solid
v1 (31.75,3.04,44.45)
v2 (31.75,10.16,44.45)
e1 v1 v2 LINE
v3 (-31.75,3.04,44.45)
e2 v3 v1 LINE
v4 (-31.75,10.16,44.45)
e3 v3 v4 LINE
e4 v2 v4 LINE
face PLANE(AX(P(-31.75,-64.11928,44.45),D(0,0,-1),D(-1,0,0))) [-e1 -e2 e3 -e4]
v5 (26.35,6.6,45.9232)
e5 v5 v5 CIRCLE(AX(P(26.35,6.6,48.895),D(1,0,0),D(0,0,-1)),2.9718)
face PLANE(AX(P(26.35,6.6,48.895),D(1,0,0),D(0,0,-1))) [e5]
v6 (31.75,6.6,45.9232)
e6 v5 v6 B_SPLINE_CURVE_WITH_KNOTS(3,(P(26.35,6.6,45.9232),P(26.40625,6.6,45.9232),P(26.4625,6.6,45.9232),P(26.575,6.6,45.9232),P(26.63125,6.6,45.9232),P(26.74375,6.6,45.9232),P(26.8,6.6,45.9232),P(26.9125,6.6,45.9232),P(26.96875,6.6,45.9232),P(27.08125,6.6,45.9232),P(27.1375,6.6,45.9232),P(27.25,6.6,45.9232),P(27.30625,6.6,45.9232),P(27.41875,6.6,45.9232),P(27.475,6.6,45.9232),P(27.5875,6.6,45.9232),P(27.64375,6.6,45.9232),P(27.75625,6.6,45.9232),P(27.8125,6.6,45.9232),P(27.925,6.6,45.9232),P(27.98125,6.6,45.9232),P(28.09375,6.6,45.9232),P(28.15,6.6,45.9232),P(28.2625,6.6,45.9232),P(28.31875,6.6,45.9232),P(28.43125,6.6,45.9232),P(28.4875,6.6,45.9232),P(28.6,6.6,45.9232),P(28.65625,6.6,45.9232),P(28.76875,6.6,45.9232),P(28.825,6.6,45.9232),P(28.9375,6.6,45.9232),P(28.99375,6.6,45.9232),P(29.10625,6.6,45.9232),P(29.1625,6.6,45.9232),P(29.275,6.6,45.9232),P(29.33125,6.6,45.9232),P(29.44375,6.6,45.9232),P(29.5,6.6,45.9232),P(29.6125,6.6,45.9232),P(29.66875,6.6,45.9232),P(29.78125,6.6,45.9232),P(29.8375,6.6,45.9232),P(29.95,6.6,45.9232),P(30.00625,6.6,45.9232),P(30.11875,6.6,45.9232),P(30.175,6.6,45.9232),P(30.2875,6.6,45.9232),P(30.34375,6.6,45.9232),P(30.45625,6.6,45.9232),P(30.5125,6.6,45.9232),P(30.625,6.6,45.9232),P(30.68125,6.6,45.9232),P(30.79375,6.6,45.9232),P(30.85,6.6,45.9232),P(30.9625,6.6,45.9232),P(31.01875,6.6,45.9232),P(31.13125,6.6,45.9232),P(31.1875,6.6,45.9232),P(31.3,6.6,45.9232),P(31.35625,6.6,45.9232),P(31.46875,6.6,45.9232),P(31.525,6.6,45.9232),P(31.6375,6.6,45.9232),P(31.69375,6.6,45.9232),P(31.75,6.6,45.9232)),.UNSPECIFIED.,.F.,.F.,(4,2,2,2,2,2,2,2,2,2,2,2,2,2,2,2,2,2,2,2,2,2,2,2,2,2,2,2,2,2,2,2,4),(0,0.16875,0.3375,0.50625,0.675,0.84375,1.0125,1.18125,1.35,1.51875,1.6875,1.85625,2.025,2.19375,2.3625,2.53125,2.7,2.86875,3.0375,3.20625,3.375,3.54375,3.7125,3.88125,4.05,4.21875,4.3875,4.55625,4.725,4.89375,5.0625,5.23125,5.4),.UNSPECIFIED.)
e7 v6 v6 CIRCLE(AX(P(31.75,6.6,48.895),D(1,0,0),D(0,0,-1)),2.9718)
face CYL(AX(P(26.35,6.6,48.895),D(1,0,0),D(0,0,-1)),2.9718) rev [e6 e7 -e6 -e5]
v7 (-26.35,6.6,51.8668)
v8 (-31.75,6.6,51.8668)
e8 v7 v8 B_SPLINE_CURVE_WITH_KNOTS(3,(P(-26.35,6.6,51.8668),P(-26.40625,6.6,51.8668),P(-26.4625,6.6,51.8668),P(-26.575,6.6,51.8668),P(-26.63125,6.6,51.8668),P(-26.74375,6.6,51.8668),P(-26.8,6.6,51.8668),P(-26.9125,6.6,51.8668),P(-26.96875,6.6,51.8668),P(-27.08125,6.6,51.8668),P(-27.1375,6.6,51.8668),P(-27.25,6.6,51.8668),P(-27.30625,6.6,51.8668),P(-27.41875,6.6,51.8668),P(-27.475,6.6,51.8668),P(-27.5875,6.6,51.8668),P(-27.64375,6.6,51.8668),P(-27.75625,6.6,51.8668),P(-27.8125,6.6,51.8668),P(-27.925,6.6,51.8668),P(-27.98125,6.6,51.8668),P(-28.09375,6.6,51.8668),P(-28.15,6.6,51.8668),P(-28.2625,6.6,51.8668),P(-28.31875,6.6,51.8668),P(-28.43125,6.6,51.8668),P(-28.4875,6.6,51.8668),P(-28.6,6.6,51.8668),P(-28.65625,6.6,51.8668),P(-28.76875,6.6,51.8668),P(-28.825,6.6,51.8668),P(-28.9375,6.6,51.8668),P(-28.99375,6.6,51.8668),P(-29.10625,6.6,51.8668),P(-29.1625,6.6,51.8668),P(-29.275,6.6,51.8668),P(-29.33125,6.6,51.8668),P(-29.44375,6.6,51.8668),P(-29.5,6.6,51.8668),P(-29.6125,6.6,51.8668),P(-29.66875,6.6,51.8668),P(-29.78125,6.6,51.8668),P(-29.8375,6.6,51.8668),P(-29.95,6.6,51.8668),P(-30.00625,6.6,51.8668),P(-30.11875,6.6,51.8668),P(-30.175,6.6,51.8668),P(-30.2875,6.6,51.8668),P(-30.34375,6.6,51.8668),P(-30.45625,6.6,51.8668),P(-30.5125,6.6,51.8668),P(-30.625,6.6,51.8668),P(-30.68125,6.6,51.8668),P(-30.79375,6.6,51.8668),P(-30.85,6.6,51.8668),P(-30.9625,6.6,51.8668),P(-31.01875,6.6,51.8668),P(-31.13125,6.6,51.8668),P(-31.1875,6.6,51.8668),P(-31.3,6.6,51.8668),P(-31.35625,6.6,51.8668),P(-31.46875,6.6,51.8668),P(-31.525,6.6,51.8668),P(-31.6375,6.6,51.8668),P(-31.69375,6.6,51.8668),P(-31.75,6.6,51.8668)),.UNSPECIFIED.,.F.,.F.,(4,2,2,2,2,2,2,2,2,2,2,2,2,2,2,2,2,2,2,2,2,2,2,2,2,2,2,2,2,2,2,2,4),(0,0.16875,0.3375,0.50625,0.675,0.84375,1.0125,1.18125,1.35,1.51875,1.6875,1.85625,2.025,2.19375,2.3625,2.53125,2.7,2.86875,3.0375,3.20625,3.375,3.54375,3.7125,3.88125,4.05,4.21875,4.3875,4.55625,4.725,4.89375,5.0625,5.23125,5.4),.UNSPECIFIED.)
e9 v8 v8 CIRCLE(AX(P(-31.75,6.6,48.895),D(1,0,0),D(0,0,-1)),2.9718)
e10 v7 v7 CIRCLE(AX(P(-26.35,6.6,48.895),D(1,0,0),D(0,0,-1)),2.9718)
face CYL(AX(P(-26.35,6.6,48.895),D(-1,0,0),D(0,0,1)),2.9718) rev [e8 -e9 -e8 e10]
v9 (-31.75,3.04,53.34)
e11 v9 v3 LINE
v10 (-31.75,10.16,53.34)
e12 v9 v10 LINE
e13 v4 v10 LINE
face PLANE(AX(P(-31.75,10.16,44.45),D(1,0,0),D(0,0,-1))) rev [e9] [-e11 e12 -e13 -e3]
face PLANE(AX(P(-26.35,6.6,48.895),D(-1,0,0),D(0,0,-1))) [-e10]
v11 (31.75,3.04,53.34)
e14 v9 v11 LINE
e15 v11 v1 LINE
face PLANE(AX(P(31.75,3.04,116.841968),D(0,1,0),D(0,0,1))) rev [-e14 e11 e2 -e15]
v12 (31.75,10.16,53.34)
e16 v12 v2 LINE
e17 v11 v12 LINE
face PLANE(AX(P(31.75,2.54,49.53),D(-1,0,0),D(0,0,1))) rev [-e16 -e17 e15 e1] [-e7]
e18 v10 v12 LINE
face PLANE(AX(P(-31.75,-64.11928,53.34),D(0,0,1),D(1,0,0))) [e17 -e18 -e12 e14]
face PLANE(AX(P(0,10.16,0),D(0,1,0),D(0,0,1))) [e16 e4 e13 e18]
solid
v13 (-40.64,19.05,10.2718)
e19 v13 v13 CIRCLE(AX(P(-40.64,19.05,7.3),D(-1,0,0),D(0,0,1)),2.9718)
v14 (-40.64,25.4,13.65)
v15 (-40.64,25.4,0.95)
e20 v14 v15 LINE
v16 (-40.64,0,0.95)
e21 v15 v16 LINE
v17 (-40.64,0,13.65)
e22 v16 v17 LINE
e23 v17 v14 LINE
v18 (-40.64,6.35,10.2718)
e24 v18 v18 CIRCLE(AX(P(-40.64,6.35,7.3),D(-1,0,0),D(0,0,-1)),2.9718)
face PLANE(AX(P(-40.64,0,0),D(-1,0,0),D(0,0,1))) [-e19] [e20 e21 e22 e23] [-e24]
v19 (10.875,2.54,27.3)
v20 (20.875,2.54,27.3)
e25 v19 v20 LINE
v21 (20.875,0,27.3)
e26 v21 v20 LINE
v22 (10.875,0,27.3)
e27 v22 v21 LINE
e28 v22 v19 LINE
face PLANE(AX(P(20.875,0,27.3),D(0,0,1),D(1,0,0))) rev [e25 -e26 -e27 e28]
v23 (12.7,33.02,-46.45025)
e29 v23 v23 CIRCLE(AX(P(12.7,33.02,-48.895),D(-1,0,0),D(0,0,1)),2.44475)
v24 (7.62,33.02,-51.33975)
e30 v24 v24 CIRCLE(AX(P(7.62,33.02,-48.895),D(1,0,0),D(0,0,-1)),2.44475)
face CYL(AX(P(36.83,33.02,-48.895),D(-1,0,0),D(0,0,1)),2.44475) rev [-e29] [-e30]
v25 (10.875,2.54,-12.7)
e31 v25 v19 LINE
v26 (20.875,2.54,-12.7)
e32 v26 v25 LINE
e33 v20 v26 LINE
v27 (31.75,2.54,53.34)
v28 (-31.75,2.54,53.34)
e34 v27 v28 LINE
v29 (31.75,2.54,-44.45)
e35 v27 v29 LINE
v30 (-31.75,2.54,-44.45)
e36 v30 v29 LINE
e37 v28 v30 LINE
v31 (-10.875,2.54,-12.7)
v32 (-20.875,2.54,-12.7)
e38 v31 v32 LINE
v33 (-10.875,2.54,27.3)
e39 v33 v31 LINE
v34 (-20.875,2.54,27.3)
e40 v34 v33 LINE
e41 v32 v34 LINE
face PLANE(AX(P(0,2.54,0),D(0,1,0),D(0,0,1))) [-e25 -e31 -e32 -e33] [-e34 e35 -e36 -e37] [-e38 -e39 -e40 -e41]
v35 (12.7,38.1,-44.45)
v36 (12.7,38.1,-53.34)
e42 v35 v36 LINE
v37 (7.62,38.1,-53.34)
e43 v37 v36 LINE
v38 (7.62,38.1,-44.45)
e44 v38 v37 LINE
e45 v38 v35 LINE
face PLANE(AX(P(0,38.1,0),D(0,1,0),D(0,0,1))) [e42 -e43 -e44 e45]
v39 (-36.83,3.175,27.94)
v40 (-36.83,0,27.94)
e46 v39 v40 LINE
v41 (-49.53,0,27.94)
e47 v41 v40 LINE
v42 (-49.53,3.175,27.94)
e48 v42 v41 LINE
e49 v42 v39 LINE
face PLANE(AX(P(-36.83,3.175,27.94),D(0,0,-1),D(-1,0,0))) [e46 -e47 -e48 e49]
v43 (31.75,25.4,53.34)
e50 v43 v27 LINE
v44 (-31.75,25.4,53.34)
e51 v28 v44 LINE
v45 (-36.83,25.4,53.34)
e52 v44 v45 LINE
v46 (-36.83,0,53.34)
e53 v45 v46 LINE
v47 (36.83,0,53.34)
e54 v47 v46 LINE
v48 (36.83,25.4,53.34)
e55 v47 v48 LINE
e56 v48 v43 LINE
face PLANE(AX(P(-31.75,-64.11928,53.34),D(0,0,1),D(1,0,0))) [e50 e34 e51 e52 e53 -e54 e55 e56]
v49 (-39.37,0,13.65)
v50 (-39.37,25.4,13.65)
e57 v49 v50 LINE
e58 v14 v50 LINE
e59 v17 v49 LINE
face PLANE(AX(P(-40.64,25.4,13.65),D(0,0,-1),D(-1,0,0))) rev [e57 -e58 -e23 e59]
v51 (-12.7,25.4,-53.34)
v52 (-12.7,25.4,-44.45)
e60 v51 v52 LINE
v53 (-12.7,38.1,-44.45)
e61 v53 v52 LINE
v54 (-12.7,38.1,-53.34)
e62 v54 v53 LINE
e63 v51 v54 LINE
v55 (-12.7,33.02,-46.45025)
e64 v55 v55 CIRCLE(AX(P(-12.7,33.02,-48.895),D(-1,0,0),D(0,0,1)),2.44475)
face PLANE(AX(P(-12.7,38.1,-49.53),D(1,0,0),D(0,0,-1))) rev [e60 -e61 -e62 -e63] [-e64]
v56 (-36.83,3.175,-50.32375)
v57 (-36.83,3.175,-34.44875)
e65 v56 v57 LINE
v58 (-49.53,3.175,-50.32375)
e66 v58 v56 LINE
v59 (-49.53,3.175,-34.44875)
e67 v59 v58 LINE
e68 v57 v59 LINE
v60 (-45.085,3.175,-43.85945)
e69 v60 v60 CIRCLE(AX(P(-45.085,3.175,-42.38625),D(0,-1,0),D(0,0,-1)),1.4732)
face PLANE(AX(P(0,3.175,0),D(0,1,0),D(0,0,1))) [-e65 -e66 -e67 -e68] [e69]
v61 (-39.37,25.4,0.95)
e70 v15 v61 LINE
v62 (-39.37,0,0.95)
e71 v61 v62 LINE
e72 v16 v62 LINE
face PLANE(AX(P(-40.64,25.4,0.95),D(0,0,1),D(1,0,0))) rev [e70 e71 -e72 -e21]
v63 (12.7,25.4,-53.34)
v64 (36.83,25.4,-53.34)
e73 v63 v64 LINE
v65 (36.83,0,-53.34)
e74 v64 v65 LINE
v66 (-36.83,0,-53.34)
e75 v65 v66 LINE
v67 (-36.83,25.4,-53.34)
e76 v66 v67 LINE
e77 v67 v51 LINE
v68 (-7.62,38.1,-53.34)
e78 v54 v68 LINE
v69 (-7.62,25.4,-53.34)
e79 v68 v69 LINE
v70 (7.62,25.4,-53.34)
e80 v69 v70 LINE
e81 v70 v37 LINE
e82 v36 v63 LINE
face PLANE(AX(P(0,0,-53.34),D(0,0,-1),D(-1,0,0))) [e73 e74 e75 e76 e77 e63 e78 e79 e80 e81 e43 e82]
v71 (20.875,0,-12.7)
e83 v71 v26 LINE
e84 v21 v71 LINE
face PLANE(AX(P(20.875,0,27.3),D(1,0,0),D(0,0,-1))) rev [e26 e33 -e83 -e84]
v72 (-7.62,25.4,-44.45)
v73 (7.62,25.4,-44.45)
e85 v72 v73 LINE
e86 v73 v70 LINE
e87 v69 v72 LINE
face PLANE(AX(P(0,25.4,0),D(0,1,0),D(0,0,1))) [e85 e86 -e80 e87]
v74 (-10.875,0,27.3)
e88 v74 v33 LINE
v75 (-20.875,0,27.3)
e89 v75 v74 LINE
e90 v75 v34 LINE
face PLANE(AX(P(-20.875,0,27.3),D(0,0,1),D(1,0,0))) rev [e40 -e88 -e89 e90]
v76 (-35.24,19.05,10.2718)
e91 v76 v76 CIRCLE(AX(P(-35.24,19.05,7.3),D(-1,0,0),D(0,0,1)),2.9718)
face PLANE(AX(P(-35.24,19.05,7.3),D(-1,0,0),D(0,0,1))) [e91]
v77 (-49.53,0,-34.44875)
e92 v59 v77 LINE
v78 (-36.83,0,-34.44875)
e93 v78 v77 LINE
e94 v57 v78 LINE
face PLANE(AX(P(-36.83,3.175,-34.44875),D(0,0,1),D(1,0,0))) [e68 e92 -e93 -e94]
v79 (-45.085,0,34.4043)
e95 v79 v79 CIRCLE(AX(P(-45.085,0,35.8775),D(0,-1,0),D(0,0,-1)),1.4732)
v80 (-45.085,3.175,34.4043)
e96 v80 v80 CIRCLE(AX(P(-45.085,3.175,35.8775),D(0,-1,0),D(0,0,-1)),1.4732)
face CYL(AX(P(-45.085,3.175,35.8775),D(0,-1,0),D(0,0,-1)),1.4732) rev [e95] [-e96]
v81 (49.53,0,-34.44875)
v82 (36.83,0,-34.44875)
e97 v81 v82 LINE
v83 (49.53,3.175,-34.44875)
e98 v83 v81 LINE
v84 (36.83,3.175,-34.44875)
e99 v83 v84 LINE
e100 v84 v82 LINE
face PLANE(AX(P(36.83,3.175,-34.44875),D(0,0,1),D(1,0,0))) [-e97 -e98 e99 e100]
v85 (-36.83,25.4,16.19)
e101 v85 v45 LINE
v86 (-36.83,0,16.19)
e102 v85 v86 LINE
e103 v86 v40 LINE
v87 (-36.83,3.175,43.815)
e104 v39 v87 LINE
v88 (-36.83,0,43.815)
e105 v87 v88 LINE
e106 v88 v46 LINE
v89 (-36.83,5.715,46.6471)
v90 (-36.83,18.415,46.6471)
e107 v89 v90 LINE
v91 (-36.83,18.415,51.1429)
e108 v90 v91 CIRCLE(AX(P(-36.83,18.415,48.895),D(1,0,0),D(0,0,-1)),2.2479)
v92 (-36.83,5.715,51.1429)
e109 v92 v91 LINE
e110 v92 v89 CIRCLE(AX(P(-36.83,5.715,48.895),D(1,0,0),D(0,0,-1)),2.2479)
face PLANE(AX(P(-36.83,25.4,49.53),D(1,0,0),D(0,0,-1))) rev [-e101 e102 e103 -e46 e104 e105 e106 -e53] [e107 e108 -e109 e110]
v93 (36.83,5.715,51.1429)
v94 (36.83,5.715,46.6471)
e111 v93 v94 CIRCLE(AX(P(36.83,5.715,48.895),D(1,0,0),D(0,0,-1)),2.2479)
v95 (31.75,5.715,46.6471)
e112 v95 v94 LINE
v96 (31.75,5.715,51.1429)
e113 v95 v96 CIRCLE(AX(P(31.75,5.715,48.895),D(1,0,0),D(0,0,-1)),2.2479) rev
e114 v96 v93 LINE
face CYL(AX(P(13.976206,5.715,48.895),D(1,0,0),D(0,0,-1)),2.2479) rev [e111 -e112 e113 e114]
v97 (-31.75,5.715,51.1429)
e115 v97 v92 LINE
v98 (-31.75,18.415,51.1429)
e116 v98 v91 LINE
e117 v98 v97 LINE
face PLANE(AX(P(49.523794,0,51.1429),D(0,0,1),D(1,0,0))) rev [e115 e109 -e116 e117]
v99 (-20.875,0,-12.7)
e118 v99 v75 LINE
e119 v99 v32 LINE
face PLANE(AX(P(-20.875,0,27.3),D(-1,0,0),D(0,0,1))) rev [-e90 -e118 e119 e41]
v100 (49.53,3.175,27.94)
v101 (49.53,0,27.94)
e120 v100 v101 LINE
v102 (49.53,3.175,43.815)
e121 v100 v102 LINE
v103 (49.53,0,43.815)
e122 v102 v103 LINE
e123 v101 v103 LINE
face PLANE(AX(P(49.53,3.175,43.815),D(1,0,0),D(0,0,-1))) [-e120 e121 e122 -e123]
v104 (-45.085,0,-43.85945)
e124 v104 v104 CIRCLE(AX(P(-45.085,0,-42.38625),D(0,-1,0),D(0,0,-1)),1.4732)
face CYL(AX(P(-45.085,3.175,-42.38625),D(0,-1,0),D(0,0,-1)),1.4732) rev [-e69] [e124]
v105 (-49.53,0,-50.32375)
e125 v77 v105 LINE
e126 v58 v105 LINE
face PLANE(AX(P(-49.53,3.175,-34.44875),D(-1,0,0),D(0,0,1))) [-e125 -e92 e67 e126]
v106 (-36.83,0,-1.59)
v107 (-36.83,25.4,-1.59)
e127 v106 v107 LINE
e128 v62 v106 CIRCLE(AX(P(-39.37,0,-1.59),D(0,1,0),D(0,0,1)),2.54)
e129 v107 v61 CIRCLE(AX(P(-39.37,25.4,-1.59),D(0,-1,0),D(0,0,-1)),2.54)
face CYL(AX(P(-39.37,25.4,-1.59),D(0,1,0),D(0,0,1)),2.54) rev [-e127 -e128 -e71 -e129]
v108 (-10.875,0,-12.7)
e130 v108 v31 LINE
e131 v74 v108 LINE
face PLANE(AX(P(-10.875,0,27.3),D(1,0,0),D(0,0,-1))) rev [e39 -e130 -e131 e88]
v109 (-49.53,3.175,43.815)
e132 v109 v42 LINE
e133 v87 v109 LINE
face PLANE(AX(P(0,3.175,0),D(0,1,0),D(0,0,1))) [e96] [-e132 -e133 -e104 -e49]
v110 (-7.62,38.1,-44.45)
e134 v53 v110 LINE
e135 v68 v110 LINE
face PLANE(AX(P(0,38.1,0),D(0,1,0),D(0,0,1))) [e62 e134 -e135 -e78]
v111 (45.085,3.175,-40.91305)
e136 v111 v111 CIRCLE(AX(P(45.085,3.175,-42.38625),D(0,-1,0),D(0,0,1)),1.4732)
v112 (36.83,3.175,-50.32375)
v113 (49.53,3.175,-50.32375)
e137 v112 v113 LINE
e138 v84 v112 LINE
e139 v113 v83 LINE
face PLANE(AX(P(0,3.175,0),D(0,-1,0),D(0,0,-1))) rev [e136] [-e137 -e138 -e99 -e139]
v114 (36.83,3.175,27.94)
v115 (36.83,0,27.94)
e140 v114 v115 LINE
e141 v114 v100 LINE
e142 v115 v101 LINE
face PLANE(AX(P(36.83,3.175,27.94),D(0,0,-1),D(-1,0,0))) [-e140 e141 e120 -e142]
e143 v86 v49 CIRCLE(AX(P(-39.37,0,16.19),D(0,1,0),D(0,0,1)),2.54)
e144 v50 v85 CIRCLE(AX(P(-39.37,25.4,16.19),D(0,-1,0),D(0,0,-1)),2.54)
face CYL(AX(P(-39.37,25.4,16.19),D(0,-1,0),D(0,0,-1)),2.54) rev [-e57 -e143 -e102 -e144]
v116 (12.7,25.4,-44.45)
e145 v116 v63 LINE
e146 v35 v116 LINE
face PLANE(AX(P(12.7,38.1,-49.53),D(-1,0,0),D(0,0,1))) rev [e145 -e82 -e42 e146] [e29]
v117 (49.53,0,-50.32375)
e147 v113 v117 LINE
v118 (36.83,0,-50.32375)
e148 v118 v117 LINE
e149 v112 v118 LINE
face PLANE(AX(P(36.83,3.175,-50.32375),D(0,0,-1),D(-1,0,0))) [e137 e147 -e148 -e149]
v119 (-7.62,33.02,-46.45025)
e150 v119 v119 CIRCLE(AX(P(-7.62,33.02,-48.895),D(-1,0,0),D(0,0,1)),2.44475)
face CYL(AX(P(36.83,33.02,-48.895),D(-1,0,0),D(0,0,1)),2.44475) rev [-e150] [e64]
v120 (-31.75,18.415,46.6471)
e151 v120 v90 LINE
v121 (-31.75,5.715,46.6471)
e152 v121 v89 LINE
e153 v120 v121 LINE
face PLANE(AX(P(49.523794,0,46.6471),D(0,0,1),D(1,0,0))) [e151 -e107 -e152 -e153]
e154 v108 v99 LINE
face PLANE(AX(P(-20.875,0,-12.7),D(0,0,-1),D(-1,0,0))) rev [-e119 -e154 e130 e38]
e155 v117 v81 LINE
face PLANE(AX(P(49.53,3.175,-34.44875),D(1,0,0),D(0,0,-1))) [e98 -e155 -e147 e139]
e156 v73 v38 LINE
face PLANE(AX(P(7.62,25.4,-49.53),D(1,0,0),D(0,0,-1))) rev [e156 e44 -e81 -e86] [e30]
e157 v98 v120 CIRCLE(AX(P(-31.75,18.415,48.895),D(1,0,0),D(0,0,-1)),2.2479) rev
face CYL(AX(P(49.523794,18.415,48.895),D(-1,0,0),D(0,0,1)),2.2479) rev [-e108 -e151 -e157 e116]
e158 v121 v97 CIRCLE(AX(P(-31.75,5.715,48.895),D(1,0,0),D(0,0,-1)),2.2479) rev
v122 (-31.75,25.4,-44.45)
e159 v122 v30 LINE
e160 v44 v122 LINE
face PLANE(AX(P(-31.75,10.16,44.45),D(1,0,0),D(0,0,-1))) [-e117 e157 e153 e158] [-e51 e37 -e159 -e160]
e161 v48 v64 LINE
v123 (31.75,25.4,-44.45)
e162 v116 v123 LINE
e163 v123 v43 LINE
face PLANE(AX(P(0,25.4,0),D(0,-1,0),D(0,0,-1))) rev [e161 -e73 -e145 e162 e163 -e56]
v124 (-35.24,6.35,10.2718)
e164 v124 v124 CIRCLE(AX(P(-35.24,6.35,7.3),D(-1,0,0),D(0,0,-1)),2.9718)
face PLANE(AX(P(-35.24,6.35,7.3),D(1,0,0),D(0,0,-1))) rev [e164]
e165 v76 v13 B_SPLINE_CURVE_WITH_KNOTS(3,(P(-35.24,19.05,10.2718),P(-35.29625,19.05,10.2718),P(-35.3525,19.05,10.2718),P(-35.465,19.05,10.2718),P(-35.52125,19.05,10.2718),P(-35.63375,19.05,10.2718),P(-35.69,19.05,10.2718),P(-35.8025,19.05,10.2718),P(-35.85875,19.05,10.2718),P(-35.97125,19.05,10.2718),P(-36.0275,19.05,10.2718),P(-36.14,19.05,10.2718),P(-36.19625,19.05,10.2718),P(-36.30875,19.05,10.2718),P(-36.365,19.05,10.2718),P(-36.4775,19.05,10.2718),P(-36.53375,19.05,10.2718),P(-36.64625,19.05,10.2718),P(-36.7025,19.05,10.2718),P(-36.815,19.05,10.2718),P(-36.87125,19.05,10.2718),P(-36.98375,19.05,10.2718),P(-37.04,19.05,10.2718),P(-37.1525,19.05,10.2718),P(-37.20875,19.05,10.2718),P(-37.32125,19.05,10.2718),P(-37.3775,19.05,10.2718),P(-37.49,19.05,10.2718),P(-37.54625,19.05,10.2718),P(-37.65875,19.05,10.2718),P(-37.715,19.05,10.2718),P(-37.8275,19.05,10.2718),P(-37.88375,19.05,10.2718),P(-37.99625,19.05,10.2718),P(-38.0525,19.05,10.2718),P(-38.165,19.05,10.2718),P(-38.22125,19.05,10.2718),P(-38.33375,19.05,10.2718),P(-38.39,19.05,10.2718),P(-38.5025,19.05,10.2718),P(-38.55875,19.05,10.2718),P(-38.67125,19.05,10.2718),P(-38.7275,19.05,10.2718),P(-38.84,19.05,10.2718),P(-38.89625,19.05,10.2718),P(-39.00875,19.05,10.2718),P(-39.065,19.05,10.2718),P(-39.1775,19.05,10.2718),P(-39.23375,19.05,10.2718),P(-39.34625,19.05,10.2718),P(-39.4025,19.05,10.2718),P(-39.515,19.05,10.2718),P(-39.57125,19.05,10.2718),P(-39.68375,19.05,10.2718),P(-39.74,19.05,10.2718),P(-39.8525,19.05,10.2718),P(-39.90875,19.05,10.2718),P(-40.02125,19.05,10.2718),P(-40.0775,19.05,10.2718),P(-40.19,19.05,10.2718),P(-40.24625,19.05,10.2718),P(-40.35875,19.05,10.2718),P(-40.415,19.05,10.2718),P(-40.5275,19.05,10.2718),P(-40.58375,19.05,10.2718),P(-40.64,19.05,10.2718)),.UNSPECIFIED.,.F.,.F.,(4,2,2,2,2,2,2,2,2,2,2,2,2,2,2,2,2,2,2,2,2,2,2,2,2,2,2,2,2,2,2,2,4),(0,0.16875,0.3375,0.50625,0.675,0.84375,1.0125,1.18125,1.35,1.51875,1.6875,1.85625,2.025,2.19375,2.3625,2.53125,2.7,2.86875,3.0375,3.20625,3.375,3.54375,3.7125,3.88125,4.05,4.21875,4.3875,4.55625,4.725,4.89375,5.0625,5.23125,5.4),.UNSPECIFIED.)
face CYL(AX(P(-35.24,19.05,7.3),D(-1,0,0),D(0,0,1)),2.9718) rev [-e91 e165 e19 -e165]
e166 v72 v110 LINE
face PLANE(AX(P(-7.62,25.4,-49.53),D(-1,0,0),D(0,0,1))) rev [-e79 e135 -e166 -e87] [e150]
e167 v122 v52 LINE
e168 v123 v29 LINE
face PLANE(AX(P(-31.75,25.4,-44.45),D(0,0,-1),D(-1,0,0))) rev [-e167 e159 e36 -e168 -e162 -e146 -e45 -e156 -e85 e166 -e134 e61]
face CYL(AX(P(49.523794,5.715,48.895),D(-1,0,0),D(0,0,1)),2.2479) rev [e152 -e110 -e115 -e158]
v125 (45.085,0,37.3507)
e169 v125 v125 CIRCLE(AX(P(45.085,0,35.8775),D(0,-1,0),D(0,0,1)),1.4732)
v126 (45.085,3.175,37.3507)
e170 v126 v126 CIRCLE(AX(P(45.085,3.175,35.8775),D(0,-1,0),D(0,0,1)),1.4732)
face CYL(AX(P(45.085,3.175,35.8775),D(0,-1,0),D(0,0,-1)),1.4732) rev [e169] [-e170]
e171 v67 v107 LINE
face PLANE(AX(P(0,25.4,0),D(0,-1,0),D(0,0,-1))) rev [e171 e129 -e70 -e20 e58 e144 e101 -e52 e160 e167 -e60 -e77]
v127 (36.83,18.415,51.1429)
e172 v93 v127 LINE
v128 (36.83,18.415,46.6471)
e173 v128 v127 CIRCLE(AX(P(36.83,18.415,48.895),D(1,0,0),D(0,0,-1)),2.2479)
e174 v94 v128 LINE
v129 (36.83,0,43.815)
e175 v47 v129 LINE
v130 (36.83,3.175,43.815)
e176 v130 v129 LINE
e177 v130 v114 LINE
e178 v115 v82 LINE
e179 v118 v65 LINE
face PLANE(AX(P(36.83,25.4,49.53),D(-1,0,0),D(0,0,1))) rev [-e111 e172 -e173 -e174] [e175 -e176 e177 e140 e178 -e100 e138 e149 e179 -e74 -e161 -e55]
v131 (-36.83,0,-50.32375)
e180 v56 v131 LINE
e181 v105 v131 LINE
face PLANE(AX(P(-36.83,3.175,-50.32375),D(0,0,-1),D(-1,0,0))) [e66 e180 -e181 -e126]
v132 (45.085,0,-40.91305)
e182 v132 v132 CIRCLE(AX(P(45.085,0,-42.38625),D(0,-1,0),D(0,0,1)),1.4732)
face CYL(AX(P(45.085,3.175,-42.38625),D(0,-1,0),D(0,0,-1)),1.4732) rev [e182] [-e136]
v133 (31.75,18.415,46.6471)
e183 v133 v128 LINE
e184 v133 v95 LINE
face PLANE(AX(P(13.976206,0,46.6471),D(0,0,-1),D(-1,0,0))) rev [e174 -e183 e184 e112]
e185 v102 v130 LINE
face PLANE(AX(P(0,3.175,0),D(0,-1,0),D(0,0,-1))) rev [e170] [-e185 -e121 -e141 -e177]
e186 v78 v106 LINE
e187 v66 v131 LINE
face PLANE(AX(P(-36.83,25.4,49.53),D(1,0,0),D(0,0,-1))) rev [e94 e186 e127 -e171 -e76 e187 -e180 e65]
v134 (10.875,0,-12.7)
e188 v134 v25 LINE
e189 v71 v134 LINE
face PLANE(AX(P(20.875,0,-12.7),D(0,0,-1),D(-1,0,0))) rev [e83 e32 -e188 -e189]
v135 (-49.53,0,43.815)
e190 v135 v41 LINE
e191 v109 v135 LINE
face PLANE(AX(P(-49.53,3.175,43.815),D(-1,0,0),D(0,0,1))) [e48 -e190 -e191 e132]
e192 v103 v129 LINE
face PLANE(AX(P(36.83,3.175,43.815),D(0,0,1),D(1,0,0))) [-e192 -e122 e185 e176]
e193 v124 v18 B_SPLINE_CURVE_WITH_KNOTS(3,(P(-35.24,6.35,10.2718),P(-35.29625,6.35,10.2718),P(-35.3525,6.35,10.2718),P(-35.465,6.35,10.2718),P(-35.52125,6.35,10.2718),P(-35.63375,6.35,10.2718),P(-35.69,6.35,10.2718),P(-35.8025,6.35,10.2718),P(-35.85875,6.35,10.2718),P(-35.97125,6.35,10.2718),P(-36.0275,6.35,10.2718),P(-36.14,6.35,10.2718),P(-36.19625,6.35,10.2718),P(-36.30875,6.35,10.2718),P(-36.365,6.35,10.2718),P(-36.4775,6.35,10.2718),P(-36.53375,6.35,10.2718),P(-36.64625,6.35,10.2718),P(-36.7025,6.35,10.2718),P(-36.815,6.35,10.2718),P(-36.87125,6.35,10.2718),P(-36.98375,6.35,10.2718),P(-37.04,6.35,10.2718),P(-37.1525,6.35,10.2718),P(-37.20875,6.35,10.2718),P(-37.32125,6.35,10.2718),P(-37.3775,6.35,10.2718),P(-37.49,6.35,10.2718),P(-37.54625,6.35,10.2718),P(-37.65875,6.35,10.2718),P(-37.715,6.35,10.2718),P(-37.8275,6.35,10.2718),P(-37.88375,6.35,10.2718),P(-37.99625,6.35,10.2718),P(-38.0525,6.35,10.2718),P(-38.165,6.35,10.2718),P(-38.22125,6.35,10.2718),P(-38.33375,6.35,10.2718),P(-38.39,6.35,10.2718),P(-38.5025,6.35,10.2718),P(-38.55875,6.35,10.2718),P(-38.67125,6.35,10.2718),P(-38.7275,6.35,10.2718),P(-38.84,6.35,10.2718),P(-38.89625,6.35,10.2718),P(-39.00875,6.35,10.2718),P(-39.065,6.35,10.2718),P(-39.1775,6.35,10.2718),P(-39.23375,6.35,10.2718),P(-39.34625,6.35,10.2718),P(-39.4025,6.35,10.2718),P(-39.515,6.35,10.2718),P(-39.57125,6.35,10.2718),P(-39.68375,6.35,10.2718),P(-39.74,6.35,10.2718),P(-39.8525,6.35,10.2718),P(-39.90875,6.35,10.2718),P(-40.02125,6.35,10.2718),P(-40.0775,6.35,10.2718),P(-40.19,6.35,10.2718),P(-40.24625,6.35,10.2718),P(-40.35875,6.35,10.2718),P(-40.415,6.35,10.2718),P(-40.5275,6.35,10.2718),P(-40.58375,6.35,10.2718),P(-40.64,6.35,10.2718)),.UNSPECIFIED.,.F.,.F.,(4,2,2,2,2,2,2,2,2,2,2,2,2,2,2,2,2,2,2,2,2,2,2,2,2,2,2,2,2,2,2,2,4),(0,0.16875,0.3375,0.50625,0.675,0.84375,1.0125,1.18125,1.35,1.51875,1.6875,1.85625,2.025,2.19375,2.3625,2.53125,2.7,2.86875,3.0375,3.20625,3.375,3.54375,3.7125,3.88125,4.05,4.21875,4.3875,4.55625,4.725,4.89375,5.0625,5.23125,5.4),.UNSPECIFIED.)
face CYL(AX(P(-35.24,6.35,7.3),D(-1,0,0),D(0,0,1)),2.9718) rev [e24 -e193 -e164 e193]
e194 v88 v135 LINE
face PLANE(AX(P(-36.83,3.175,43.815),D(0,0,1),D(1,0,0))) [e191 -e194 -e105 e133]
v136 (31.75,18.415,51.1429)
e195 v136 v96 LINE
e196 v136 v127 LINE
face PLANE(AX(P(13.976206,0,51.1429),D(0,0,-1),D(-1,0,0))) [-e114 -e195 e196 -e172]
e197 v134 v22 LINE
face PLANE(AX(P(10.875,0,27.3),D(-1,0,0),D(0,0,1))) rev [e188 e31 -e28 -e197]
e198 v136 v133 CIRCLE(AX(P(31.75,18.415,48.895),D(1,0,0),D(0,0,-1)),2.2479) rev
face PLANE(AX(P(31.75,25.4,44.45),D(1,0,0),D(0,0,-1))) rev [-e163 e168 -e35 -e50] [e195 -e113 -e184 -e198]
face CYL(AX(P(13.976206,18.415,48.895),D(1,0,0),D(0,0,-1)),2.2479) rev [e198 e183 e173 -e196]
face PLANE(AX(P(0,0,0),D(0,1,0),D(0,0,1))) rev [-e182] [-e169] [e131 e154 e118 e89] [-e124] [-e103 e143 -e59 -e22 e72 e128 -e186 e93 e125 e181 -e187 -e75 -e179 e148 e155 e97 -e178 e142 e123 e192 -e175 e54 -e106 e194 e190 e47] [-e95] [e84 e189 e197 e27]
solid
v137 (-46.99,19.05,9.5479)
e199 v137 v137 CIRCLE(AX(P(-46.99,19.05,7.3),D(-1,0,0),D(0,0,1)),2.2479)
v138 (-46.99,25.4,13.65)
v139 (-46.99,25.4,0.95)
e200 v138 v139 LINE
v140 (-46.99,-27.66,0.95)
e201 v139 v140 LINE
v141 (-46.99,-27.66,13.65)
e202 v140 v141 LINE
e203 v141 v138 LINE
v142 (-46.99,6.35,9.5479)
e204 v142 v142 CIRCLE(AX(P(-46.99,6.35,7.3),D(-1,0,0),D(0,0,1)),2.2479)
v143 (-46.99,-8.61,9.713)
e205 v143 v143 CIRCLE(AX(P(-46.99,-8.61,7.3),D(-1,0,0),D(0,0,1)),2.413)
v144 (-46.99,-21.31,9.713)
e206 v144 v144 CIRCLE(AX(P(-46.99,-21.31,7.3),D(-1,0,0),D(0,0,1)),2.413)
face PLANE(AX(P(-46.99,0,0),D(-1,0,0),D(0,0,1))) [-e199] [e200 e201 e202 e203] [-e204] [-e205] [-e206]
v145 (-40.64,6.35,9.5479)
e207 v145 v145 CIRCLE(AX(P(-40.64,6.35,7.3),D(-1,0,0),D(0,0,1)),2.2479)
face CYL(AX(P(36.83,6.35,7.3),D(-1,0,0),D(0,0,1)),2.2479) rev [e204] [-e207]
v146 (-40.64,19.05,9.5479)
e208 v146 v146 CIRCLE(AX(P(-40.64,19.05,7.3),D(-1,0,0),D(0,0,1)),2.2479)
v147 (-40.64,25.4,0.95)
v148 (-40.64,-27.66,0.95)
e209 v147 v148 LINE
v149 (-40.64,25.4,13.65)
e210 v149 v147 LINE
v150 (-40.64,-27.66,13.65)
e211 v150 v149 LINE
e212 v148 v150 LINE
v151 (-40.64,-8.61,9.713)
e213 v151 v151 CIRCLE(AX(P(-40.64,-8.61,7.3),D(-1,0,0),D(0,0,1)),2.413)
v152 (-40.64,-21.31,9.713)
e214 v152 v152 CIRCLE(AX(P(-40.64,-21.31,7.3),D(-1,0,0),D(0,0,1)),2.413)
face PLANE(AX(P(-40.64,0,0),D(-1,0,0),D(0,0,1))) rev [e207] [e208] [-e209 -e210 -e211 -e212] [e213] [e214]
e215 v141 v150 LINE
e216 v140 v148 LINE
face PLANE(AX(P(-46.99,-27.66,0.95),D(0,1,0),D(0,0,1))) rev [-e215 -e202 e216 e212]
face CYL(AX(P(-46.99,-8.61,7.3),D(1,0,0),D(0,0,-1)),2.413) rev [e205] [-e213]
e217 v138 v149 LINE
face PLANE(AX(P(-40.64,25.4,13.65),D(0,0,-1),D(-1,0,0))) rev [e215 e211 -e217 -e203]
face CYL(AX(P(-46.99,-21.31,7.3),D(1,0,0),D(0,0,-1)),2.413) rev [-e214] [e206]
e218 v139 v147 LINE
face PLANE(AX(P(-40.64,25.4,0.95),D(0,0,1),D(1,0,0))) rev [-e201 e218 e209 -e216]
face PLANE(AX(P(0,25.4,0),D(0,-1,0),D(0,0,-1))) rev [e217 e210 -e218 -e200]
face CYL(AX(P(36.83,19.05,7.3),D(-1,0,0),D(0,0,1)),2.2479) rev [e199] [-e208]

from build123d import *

# Parameters (mm, degrees)
SKETCH3_W                  = 63.5
SKETCH3_H                  = 88.9
BOSS_EXTRUDE1_DEPTH        = 2.54
BOSS_EXTRUDE2_DEPTH        = 25.4
SKETCH11_W                 = 25.4
SKETCH11_H                 = 5.08
BOSS_EXTRUDE10_DEPTH       = 12.7
SKETCH12_W                 = 15.24
SKETCH12_H                 = 5.08
CUT_EXTRUDE3_DEPTH         = 12.7
BOSS_EXTRUDE11_DEPTH       = 3.81
SKETCH13_R                 = 2.44475
CUT_EXTRUDE4_DEPTH         = 83.158301467
SKETCH5_W                  = 10
SKETCH5_H                  = 40
WHEEL_CUTOUTS_DEPTH        = 74.933200255
SKETCH7_W                  = 12.7
SKETCH7_H                  = 25.4
BOSS_EXTRUDE4_DEPTH        = 3.81
SKETCH8_W                  = 12.7
SKETCH8_H                  = 53.06
SKETCH8_R                  = 2.413
BOSS_EXTRUDE5_DEPTH        = 6.35
FILLET1_R                  = 2.54
BOSS_EXTRUDE9_START        = -2.54
SKETCH9_W                  = 63.5
SKETCH9_H                  = 8.89
BOSS_EXTRUDE9_DEPTH        = 10.16
CUT_EXTRUDE2_REACH         = 116.989
SKETCH10_W                 = 63.5
SKETCH10_H                 = 0.5
SPLIT2_START               = -31.75
SPLIT2_OUTLINE_W           = 7.12
SPLIT2_OUTLINE_H           = 8.89
SPLIT2_DEPTH               = 63.5
SPLIT2_2_OUTLINE_W         = 7.12
SPLIT2_2_OUTLINE_H         = 8.89
SPLIT2_2_DEPTH             = 63.5
SKETCH15_R                 = 2.9718
HEATSERT_HOLES_DEPTH       = 5.4
EXTRA_LENGTH_DEPTH         = 3.81
SLOT_DEPTH                 = 68.58
SKETCH18_R                 = 2.9718
MOTOR_HEATSERT_HOLES_DEPTH = 5.4
SKETCH19_R                 = 2.2479
CUT_EXTRUDE6_DEPTH         = 107.407509134
SKETCH20_W                 = 12.7
SKETCH20_H                 = 15.875
SKETCH20_R                 = 1.4732
FEET_DEPTH                 = 3.175


# Read off the part's stored shape, not the designer's step: Split2, Split3
with BuildPart() as part:
    # Sketch3 → Boss-Extrude1 (new body)
    with BuildSketch(Plane(origin=(0, 0, 0), x_dir=(1, 0, 0), z_dir=(0, 1, 0))):
        Rectangle(SKETCH3_W, SKETCH3_H)
    extrude(amount=BOSS_EXTRUDE1_DEPTH)

    # Sketch4 → Boss-Extrude2 (add)
    with BuildSketch(Plane(origin=(0, 0, 0), x_dir=(1, 0, 0), z_dir=(0, 1, 0))):
        Polygon((-31.75, -44.45), (-31.75, 44.45), (31.75, 44.45), (31.75, -44.45), (31.75, -49.53), (36.83, -49.53), (36.83, 49.53), (-36.83, 49.53), (-36.83, -49.53), (-31.75, -49.53), align=None)
    extrude(amount=BOSS_EXTRUDE2_DEPTH)

    # Sketch11 → Boss-Extrude10 (add)
    with BuildSketch(Plane(origin=(0, 25.4, 0), x_dir=(1, 0, 0), z_dir=(0, 1, 0))):
        with Locations((0, 46.99)):
            Rectangle(SKETCH11_W, SKETCH11_H)
    extrude(amount=BOSS_EXTRUDE10_DEPTH)

    # Sketch12 → Cut-Extrude3 (cut)
    with BuildSketch(Plane(origin=(0, 38.1, 0), x_dir=(1, 0, 0), z_dir=(0, 1, 0))):
        with Locations((0, 46.99)):
            Rectangle(SKETCH12_W, SKETCH12_H)
    extrude(amount=-CUT_EXTRUDE3_DEPTH, mode=Mode.SUBTRACT)

    # Sketch14 → Boss-Extrude11 (add)
    with BuildSketch(Plane(origin=(0, 0, -49.53), x_dir=(-1, 0, 0), z_dir=(0, 0, -1))):
        Polygon((12.7, 38.1), (7.62, 38.1), (7.62, 25.4), (-7.62, 25.4), (-7.62, 38.1), (-12.7, 38.1), (-12.7, 25.4), (-36.83, 25.4), (-36.83, 0), (36.83, 0), (36.83, 25.4), (12.7, 25.4), align=None)
    extrude(amount=BOSS_EXTRUDE11_DEPTH)

    # Sketch13 → Cut-Extrude4 (cut, through all)
    with BuildSketch(Plane.ZY.offset(12.7)):
        with Locations((-48.895, 33.02)):
            Circle(SKETCH13_R)
    extrude(amount=-CUT_EXTRUDE4_DEPTH, mode=Mode.SUBTRACT)

    # Sketch5 → Wheel Cutouts (cut, through all)
    with BuildSketch(Plane(origin=(0, 2.54, 0), x_dir=(1, 0, 0), z_dir=(0, 1, 0))):
        with Locations((15.875, -7.3)):
            Rectangle(SKETCH5_W, SKETCH5_H)
        with Locations((-15.875, -7.3)):
            Rectangle(SKETCH5_W, SKETCH5_H)
    extrude(amount=-WHEEL_CUTOUTS_DEPTH, mode=Mode.SUBTRACT)

    # Sketch7 → Boss-Extrude4 (add)
    with BuildSketch(Plane.ZY.offset(36.83)):
        with Locations((7.3, 12.7)):
            Rectangle(SKETCH7_W, SKETCH7_H)
    extrude(amount=BOSS_EXTRUDE4_DEPTH)

    # Sketch8 → Boss-Extrude5 (add)
    with BuildSketch(Plane.ZY.offset(40.64)):
        with Locations((7.3, -1.13)):
            Rectangle(SKETCH8_W, SKETCH8_H)
        with Locations((7.3, -21.31)):
            Circle(SKETCH8_R, mode=Mode.SUBTRACT)
        with Locations((7.3, -8.61)):
            Circle(SKETCH8_R, mode=Mode.SUBTRACT)
    extrude(amount=BOSS_EXTRUDE5_DEPTH)

    # Fillet1
    fillet1_edges = [part.edges().sort_by_distance(p)[0] for p in [
        (-36.83, 12.7, 0.95),
        (-36.83, 12.7, 13.65),
    ]]
    fillet(fillet1_edges, radius=FILLET1_R)

    # Sketch9 → Boss-Extrude9 (add)
    with BuildSketch(Plane(origin=(0, 2.54, 0), x_dir=(1, 0, 0), z_dir=(0, 1, 0)).offset(BOSS_EXTRUDE9_START)):
        with Locations((0, -48.895)):
            Rectangle(SKETCH9_W, SKETCH9_H)
    extrude(amount=BOSS_EXTRUDE9_DEPTH)

    # Cut-Extrude2: up to this face of the body (flat: up to its plane)
    cut_extrude2_end = Plane(part.part.faces().sort_by_distance((0, 5.08, 53.34))[0])
    # Sketch10 → Cut-Extrude2 (cut, up to the picked face)
    with BuildSketch(Plane(origin=(0, 0, 44.45), x_dir=(-1, 0, 0), z_dir=(0, 0, -1)), mode=Mode.PRIVATE) as cut_extrude2_sk1:
        with Locations((0, 2.79)):
            Rectangle(SKETCH10_W, SKETCH10_H)
    cut_extrude2_tool1 = split(extrude(cut_extrude2_sk1.sketch, amount=-CUT_EXTRUDE2_REACH, mode=Mode.PRIVATE), bisect_by=cut_extrude2_end, keep=Keep.BOTH, mode=Mode.PRIVATE)
    add(cut_extrude2_tool1.solids().sort_by(Axis((0, 2.79, 44.45), (0, 0, 1)))[0], mode=Mode.SUBTRACT)

    # Split2 outline → Split2 (cut)
    with BuildSketch(Plane.YZ.offset(SPLIT2_START)):
        with Locations((6.6, 48.895)):
            Rectangle(SPLIT2_OUTLINE_W, SPLIT2_OUTLINE_H)
    extrude(amount=SPLIT2_DEPTH, mode=Mode.SUBTRACT)

    # Sketch16 → Extra Length (add)
    with BuildSketch(Plane.XY.offset(49.53)):
        Polygon((-36.83, 0), (-31.75, 0), (-31.75, 2.54), (-31.75, 25.4), (-36.83, 25.4), align=None)
        Polygon((31.75, 0), (36.83, 0), (36.83, 25.4), (31.75, 25.4), (31.75, 2.54), align=None)
    extrude(amount=EXTRA_LENGTH_DEPTH)

    # Sketch17 → Slot (cut)
    with BuildSketch(Plane(origin=(36.83, 0, 0), x_dir=(0, 0, -1), z_dir=(1, 0, 0))):
        with BuildLine():
            Line((-51.1429, 5.715), (-51.1429, 18.415))
            ThreePointArc((-51.1429, 18.415), (-48.895, 20.6629), (-46.6471, 18.415))
            Line((-46.6471, 18.415), (-46.6471, 5.715))
            ThreePointArc((-46.6471, 5.715), (-48.895, 3.4671), (-51.1429, 5.715))
        make_face()
    slot = extrude(amount=-SLOT_DEPTH, mode=Mode.SUBTRACT)

    # Mirror3: Slot across plane
    add(slot.mirror(Plane(origin=(0, 0, 0), x_dir=(0, 0, 1), z_dir=(1, 0, 0))), mode=Mode.SUBTRACT)


with BuildPart() as body_2:
    # Split2 2 outline → Split2 2 (new body)
    with BuildSketch(Plane.YZ.offset(SPLIT2_START)):
        with Locations((6.6, 48.895)):
            Rectangle(SPLIT2_2_OUTLINE_W, SPLIT2_2_OUTLINE_H)
    extrude(amount=SPLIT2_2_DEPTH)

    # Sketch15 → Heatsert Holes (cut)
    with BuildSketch(Plane(origin=(31.75, 0, 0), x_dir=(0, 0, -1), z_dir=(1, 0, 0))):
        with Locations((-48.895, 6.6)):
            Circle(SKETCH15_R)
    heatsert_holes = extrude(amount=-HEATSERT_HOLES_DEPTH, mode=Mode.SUBTRACT)

    # Mirror1: Heatsert Holes across plane
    add(heatsert_holes.mirror(Plane(origin=(0, 0, 0), x_dir=(0, 0, 1), z_dir=(1, 0, 0))), mode=Mode.SUBTRACT)


with BuildPart() as body_3:
    # Split3: the piece on the far side of the plane
    add(part.part)
    split(bisect_by=Plane.YZ.offset(-40.64), keep=Keep.BOTTOM)

    # Sketch19 → Cut-Extrude6 (cut, through all)
    with BuildSketch(Plane.ZY.offset(46.99)):
        with Locations((7.3, 19.05)):
            Circle(SKETCH19_R)
        with Locations((7.3, 6.35)):
            Circle(SKETCH19_R)
    extrude(amount=-CUT_EXTRUDE6_DEPTH, mode=Mode.SUBTRACT)


with BuildPart() as part_1:
    add(part.part)

    # Split3
    split(bisect_by=Plane.YZ.offset(-40.64), keep=Keep.TOP)

    # Sketch18 → Motor Heatsert Holes (cut)
    with BuildSketch(Plane.ZY.offset(40.64)):
        with Locations((7.3, 19.05)):
            Circle(SKETCH18_R)
        with Locations((7.3, 6.35)):
            Circle(SKETCH18_R)
    extrude(amount=-MOTOR_HEATSERT_HOLES_DEPTH, mode=Mode.SUBTRACT)

    # Sketch20 → Feet (add)
    # profile 1 of 4: a face of its own
    with BuildSketch(Plane.XZ):
        with Locations((-43.18, 35.8775)):
            Rectangle(SKETCH20_W, SKETCH20_H)
        with Locations(Location((-45.085, 35.8775, 0), (0, 0, 270))):
            Circle(SKETCH20_R, mode=Mode.SUBTRACT)
    # profile 2 of 4: a face of its own
    with BuildSketch(Plane.XZ):
        with Locations((-43.18, -42.38625)):
            Rectangle(SKETCH20_W, SKETCH20_H)
        with Locations(Location((-45.085, -42.38625, 0), (0, 0, 270))):
            Circle(SKETCH20_R, mode=Mode.SUBTRACT)
    # profile 3 of 4: a face of its own
    with BuildSketch(Plane.XZ):
        with Locations((43.18, -42.38625)):
            Rectangle(SKETCH20_W, SKETCH20_H)
        with Locations(Location((45.085, -42.38625, 0), (0, 0, 90))):
            Circle(SKETCH20_R, mode=Mode.SUBTRACT)
    # profile 4 of 4: a face of its own
    with BuildSketch(Plane.XZ):
        with Locations((43.18, 35.8775)):
            Rectangle(SKETCH20_W, SKETCH20_H)
        with Locations(Location((45.085, 35.8775, 0), (0, 0, 90))):
            Circle(SKETCH20_R, mode=Mode.SUBTRACT)
    extrude(amount=-FEET_DEPTH)


solid = Compound([body_2.part, body_3.part, part_1.part])
